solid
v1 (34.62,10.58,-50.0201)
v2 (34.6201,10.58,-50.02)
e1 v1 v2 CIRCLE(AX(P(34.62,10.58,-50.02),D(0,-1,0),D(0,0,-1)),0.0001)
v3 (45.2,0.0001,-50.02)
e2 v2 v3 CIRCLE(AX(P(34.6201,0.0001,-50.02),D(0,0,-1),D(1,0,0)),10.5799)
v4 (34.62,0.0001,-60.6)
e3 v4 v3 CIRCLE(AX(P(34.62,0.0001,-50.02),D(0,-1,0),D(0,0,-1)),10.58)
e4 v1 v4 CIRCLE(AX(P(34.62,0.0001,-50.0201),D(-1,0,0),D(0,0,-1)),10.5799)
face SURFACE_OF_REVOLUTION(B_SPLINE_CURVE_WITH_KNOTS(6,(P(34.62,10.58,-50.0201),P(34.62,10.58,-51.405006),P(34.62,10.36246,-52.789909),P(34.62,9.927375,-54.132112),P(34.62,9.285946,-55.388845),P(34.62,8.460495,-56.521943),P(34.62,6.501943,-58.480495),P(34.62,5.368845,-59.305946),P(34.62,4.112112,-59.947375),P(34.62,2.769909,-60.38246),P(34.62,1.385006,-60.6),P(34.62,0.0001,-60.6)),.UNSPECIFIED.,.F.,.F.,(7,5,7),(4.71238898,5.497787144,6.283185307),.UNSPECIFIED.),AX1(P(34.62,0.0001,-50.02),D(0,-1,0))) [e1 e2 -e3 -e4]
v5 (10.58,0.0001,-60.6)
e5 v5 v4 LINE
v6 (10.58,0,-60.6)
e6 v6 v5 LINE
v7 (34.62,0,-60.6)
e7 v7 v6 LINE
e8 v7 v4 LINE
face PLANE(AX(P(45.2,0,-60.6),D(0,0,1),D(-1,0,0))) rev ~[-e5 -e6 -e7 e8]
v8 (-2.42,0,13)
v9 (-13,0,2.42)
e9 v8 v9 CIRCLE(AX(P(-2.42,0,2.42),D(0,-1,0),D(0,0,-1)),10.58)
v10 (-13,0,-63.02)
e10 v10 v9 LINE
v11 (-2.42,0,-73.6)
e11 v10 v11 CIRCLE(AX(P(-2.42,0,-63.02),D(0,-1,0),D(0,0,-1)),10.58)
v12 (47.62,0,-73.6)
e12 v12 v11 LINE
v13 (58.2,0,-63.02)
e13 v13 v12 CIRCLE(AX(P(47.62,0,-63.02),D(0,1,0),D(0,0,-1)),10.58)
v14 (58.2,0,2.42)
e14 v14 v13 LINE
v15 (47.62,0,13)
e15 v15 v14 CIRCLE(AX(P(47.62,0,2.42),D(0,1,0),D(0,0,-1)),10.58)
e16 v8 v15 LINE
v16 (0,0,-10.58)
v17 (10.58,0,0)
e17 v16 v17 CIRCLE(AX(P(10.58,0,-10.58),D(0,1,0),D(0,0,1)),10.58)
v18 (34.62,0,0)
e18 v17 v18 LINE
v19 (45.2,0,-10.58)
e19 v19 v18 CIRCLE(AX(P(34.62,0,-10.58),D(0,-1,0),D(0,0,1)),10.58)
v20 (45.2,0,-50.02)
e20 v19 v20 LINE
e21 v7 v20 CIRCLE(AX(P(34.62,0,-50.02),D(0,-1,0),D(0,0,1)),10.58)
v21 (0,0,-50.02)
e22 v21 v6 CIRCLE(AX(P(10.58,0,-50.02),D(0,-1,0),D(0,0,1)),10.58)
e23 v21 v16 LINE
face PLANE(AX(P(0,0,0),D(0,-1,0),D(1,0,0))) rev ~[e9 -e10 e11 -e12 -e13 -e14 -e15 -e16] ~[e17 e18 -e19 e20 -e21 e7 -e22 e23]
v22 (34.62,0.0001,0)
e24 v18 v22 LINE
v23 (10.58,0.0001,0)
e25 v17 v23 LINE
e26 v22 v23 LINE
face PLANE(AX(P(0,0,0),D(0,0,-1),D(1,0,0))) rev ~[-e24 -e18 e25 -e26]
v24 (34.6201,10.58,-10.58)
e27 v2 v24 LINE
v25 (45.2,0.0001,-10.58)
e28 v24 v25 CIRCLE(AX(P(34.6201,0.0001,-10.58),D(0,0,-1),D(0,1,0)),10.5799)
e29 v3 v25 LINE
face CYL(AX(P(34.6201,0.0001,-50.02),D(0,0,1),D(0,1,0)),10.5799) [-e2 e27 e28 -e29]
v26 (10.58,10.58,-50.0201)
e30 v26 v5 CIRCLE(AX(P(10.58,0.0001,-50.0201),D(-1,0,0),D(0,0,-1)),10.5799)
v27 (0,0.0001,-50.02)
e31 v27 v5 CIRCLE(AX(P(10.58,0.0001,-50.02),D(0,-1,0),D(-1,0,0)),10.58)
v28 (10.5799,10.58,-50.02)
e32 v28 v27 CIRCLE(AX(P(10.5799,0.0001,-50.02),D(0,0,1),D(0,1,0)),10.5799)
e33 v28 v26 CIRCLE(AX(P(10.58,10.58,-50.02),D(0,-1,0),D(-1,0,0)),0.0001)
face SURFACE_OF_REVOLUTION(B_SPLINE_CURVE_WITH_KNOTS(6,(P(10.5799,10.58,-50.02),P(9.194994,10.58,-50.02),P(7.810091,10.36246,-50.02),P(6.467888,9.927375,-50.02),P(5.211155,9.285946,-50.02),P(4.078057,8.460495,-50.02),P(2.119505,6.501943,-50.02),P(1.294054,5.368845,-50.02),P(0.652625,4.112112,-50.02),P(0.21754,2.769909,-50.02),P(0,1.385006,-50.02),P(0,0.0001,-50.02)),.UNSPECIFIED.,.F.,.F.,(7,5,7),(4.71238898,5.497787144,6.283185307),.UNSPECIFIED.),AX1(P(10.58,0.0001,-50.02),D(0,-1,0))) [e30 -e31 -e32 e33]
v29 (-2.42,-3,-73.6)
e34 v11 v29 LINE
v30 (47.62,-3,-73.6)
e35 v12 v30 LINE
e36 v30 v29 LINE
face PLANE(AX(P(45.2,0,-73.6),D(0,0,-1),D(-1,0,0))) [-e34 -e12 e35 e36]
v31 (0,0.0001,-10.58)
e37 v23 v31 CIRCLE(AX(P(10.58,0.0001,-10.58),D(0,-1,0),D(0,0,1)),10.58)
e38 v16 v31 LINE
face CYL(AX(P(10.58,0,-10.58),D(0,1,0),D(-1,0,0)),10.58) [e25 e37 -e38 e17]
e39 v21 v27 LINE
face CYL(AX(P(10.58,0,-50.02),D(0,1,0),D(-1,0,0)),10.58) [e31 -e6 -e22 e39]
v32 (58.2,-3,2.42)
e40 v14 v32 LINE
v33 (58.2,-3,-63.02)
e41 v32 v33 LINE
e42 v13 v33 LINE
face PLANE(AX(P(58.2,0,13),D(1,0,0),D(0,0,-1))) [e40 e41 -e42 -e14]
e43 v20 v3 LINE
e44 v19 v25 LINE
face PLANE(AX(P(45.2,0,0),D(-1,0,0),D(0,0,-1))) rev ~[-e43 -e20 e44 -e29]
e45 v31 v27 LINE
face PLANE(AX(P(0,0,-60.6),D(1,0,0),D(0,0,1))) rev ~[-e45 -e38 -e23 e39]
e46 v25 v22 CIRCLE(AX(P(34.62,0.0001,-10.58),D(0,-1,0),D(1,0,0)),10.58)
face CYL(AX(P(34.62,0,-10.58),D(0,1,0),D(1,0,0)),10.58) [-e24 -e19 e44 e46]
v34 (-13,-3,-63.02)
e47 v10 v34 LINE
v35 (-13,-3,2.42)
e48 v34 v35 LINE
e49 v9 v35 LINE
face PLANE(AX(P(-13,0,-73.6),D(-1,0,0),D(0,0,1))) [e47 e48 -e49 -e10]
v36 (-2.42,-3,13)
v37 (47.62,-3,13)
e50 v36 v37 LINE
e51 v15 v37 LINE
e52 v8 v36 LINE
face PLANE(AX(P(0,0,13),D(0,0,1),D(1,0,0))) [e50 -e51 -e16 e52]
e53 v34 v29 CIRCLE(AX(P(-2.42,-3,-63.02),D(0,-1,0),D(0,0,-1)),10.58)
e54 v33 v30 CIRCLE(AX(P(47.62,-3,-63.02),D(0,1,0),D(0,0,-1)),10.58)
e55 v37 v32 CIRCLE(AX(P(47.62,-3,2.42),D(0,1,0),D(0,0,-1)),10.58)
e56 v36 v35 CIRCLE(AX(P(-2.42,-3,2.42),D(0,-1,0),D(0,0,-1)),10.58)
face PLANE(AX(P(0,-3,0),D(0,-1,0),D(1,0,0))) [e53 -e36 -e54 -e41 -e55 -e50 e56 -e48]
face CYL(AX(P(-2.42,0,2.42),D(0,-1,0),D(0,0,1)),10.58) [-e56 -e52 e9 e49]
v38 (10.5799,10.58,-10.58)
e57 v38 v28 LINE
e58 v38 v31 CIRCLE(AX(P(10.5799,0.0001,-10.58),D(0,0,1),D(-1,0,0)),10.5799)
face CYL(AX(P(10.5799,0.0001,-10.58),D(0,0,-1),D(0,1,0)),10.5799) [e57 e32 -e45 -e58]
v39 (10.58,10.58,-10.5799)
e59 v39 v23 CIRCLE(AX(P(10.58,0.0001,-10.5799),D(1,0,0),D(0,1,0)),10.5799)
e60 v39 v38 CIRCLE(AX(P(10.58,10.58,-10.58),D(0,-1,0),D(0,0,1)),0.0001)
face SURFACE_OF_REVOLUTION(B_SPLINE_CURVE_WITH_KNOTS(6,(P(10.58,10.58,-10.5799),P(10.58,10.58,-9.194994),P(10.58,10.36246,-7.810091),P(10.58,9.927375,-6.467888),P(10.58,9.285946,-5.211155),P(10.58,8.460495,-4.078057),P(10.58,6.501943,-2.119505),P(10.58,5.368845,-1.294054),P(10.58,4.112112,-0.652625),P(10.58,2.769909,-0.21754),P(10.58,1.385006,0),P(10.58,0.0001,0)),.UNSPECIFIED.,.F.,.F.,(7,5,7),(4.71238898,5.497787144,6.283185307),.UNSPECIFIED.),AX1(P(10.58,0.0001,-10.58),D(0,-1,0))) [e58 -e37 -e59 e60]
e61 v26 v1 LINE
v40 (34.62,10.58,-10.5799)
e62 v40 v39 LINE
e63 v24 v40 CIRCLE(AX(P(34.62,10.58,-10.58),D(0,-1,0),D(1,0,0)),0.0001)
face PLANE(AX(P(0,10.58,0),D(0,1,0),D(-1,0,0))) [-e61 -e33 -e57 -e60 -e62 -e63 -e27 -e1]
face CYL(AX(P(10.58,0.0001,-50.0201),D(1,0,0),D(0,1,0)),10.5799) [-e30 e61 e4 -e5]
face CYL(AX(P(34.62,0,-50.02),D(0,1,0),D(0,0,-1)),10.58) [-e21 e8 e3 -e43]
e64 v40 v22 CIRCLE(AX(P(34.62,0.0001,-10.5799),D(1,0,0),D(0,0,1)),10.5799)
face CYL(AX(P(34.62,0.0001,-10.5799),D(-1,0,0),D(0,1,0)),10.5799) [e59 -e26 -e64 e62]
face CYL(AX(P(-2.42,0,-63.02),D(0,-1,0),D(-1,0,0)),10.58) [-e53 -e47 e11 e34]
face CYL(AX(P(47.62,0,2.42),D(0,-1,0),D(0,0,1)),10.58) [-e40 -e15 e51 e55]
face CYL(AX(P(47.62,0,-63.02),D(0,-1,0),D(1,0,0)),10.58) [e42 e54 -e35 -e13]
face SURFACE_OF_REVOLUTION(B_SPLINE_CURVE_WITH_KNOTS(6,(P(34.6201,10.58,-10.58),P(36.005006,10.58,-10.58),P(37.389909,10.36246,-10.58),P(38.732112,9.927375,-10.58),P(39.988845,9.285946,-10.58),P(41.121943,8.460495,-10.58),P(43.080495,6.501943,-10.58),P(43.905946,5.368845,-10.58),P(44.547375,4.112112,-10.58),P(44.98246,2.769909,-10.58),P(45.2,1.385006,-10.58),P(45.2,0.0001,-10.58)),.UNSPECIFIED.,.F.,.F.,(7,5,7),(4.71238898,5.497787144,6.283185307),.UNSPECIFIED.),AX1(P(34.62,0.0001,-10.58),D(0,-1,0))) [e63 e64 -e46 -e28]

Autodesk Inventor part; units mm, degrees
ref_plane "YZ Plane" through (0, 0, 0) normal (1, 0, 0) x (0, 1, 0)
ref_plane "XZ Plane" through (0, 0, 0) normal (0, 1, 0) x (-1, 0, 0)
ref_plane "XY Plane" through (0, 0, 0) normal (0, 0, 1) x (1, 0, 0)
sketch "Sketch1" plane through (0, 0, 0) normal (0, 1, 0) x (-1, 0, 0)
  line L0 (0, 0) -> (-45.2, 0)
  line L1 (-45.2, 0) -> (-45.2, -60.6)
  line L2 (-45.2, -60.6) -> (0, -60.6)
  line L3 (0, -60.6) -> (0, 0)
  dimension "d0" = 45.2
  dimension "d1" = 60.6
extrude "Extrusion1" add sketch "Sketch1" along normal blind 10.58
fillet "Fillet1" radius 10.58 4 edges at (45.2, 5.29, 0) (45.2, 5.29, -60.6) (0, 5.29, -60.6) (0, 5.29, 0)
fillet "Fillet2" radius 10.58 8 edges at (42.1012, 10.58, -57.5012) (22.6, 10.58, -60.6) (3.0988, 10.58, -57.5012) (0, 10.58, -30.3) (3.0988, 10.58, -3.0988) (22.6, 10.58, 0) (42.1012, 10.58, -3.0988) (45.2, 10.58, -30.3)
sketch "Sketch3" plane through (0, 0, 0) normal (0, -1, 0) x (1, 0, 0)
  line L0 (0, 0) -> (-13, 0)
  line L1 (-13, 0) -> (-13, 13)
  line L2 (-13, 13) -> (0, 13)
  line L3 (0, 13) -> (0, 0)
  line L4 (34.62, -50.02) -> (34.62, -10.58) projected
  line L5 (34.62, -50.02) -> (45.2, -50.02)
  line L6 (45.2, -50.02) -> (45.2, -60.6)
  line L7 (45.2, -60.6) -> (34.62, -60.6)
  line L8 (34.62, -60.6) -> (34.62, -50.02)
  line L9 (45.2, -60.6) -> (58.2, -60.6)
  line L10 (58.2, -60.6) -> (58.2, -73.6)
  line L11 (58.2, -73.6) -> (45.2, -73.6)
  line L12 (45.2, -73.6) -> (45.2, -60.6)
  line L13 (-13, 13) -> (58.2, 13)
  line L14 (58.2, 13) -> (58.2, -73.6)
  line L15 (58.2, -73.6) -> (-13, -73.6)
  line L16 (-13, -73.6) -> (-13, 13)
  dimension "d14" = 13
  dimension "d15" = 13
  dimension "d16" = 13
  dimension "d17" = 13
extrude "Extrusion3" add sketch "Sketch3" along normal blind 3 contours L7 L8 L5 L6 | L3 L13 L14 L9 L12 L15 L16 L0 | L0 L1 L2 L3 | L12 L9 L10 L11
fillet "Fillet4" radius 10.58 4 edges at (-13, -1.5, 13) (-13, -1.5, -73.6) (58.2, -1.5, -73.6) (58.2, -1.5, 13)
properties part number "Airpods Pro Base"
